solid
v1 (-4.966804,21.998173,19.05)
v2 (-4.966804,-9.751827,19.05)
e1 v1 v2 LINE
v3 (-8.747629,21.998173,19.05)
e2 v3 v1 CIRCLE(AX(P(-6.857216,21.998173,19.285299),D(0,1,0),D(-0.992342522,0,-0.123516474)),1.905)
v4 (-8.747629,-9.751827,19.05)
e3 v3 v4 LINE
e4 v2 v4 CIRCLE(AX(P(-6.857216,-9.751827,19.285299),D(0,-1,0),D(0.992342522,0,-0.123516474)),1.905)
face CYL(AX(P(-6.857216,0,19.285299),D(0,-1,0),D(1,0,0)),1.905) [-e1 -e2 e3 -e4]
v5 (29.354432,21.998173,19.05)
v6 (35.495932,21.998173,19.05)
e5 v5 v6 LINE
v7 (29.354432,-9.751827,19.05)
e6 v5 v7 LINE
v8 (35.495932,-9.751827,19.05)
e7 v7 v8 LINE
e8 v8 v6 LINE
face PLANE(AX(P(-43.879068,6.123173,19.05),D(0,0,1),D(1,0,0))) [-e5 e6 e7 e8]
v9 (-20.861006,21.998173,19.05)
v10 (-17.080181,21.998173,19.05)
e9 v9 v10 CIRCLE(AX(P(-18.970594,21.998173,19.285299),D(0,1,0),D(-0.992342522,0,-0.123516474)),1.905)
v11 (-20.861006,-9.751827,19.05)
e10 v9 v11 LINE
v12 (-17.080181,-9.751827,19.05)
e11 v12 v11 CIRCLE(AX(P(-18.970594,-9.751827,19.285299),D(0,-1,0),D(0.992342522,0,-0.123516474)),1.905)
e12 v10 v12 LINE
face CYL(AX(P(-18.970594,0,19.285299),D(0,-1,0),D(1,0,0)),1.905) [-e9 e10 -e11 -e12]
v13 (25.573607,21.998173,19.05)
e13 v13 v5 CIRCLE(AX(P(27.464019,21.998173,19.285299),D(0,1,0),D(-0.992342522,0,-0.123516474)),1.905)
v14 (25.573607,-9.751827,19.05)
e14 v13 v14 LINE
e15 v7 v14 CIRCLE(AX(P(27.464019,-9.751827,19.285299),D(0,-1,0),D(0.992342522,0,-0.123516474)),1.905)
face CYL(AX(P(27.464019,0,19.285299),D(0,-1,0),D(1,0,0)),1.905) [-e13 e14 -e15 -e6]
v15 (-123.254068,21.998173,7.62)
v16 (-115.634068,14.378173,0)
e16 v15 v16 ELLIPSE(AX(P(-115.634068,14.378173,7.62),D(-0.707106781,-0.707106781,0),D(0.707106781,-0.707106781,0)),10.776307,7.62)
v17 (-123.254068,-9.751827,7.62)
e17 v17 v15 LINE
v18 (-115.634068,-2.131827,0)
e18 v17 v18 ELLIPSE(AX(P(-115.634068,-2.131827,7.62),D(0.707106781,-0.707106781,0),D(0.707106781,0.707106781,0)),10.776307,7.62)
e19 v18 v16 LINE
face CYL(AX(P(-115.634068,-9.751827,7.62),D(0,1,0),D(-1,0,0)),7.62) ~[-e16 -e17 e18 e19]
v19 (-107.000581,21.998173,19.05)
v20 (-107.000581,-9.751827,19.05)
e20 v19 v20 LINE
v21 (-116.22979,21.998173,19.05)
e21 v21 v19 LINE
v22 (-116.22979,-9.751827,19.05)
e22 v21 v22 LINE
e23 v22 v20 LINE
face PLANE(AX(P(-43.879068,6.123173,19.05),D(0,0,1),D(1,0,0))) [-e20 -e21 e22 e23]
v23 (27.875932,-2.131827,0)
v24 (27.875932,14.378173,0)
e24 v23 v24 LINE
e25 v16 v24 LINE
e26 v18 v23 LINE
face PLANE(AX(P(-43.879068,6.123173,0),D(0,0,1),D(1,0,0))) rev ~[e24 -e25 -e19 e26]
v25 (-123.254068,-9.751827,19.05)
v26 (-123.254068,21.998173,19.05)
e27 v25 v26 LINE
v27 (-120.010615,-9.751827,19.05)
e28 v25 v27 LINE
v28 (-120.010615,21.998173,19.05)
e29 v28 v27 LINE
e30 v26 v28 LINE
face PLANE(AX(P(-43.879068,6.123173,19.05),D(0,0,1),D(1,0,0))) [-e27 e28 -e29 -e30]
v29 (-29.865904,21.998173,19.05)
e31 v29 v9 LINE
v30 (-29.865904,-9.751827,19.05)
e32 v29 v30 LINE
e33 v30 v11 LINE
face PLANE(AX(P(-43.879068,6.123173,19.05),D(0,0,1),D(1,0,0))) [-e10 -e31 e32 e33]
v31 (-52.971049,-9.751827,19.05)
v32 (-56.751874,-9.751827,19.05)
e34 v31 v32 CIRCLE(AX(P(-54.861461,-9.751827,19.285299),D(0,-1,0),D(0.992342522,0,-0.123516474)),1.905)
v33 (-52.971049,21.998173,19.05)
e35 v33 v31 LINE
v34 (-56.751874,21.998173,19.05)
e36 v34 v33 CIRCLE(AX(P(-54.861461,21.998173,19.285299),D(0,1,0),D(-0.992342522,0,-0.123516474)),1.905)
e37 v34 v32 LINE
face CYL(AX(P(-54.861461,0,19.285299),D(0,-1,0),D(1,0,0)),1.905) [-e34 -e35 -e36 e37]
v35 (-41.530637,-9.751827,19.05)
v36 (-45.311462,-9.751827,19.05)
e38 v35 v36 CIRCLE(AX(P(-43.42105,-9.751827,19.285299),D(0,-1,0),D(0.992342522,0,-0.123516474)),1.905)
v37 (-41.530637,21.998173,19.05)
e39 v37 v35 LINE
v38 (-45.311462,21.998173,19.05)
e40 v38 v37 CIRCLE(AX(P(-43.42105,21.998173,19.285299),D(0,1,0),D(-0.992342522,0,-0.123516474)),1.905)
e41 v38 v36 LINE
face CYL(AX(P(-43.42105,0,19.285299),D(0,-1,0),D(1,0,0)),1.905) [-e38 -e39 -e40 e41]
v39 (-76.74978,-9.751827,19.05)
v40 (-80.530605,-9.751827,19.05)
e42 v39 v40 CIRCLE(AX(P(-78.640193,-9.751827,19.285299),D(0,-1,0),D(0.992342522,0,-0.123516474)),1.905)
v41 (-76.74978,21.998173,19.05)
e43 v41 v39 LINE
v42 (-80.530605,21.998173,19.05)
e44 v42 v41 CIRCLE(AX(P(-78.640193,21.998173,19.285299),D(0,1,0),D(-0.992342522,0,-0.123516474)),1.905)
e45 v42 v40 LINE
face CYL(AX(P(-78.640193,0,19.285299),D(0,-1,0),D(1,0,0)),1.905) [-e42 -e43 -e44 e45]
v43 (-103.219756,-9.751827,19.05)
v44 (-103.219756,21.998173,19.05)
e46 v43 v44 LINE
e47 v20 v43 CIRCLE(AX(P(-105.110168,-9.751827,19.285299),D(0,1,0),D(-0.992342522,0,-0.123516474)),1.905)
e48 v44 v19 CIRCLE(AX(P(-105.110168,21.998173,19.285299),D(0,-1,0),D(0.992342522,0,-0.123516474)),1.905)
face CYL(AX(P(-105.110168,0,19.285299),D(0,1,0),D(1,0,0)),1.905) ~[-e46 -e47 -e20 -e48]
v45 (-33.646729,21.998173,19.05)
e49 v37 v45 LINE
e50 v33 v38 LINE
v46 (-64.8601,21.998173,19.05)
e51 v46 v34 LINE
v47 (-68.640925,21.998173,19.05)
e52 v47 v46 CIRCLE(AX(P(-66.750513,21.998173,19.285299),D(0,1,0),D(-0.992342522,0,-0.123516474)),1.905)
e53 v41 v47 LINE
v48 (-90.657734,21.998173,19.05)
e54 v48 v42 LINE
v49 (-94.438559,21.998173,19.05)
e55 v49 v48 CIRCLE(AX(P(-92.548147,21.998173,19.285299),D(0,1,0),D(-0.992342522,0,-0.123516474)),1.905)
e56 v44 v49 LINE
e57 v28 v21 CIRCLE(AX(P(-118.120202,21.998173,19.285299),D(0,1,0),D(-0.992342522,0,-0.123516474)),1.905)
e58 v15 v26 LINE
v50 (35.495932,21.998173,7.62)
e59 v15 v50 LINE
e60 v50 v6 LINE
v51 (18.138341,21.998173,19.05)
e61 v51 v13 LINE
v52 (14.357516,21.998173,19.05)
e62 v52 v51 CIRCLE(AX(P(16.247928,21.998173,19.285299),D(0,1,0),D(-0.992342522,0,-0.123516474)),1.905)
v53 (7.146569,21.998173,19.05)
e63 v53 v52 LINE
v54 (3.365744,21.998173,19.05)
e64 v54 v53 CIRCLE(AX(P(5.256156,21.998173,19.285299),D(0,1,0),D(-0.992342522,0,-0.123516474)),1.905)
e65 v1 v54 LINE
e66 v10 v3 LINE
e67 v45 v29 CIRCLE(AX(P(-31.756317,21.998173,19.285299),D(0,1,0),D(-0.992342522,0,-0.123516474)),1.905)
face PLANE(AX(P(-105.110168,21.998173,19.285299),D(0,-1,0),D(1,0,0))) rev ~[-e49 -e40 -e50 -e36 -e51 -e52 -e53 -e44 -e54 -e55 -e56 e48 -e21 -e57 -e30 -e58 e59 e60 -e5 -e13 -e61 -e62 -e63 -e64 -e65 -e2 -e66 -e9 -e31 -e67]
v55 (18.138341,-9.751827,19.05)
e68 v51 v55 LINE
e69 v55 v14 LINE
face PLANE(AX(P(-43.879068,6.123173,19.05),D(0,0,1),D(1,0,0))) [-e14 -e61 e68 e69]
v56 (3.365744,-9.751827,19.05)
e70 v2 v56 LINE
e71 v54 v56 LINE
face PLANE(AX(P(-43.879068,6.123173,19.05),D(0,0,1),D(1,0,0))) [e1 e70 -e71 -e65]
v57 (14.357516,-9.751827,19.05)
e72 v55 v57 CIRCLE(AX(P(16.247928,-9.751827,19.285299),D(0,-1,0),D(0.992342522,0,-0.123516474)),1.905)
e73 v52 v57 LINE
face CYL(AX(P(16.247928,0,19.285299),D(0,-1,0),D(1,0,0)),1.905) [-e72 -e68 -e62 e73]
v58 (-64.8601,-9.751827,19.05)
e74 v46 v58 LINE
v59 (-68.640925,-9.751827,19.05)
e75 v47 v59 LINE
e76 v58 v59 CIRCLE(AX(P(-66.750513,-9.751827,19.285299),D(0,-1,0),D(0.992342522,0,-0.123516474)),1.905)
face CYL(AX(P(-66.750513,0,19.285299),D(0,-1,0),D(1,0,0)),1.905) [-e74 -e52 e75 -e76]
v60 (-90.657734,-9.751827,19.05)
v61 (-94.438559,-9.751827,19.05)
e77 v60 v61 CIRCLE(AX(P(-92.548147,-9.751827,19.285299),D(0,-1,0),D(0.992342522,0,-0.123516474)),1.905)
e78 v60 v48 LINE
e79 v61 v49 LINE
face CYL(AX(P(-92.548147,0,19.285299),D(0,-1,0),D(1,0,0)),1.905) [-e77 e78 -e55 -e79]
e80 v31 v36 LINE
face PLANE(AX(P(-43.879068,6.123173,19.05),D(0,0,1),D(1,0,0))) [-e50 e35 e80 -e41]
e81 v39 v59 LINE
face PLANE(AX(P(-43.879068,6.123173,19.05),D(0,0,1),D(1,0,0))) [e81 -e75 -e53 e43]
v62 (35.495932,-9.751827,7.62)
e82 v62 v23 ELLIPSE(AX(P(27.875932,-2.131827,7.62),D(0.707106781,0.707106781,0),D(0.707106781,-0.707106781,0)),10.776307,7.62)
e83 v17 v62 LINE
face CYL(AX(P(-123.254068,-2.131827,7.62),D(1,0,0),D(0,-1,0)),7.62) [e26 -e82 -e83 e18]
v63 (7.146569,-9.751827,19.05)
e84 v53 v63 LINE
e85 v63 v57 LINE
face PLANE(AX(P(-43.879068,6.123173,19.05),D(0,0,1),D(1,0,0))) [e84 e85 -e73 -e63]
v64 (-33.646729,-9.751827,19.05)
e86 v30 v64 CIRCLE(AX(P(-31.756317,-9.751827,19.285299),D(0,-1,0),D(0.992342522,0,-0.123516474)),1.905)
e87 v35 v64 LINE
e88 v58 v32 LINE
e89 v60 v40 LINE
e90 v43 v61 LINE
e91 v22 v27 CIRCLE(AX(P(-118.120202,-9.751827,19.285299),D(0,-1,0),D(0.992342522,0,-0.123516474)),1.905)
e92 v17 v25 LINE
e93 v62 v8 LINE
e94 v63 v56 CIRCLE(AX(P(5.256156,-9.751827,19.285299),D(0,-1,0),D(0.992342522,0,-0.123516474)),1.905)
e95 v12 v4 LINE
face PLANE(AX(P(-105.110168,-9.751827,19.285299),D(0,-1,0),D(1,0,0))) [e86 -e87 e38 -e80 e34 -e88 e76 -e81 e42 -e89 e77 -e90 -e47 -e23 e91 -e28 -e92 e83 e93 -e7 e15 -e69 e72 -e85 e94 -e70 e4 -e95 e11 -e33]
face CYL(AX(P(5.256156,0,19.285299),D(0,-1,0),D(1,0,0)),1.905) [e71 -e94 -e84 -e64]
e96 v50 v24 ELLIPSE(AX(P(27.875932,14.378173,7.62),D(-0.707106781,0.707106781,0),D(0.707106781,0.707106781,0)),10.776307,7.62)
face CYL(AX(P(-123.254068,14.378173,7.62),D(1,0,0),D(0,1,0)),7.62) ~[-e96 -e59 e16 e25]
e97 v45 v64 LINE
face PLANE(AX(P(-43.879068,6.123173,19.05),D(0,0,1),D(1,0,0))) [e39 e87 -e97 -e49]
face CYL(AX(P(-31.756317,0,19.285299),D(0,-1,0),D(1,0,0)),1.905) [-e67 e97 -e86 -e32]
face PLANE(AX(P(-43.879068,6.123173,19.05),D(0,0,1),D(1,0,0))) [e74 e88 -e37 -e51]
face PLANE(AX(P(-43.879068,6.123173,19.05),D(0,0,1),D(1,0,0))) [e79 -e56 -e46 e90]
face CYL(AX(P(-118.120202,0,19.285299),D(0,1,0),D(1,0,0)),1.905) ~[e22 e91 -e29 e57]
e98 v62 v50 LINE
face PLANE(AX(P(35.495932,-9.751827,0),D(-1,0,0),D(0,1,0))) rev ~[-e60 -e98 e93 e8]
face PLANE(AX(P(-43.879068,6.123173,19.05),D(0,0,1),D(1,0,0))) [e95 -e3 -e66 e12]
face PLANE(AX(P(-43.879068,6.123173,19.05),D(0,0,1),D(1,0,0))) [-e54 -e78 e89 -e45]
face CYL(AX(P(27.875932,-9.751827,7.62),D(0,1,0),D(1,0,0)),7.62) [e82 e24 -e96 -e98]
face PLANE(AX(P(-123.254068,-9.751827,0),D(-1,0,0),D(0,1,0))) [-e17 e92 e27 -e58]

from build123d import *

# Parameters (mm, degrees)
F0_W          = 158.75
F0_H          = 31.75
F1_DEPTH      = 19.05
F3_R          = 7.62
F2_R          = 1.905
F4_DEPTH      = 21.9981725439
F4_DEPTH_BACK = 9.7518274561


with BuildPart() as f1:
    # F0 (on Top) → F1 (new body)
    with BuildSketch(Plane.XY):
        with Locations((-43.8790681958, 6.1231725439)):
            Rectangle(F0_W, F0_H)
    extrude(amount=F1_DEPTH)

    # F3
    f3_edges = [f1.edges().sort_by_distance(p)[0] for p in [
        (-43.879068, 21.998173, 0),
        (-123.254068, 6.123173, 0),
        (-43.879068, -9.751827, 0),
        (35.495932, 6.123173, 0),
    ]]
    fillet(f3_edges, radius=F3_R)

    # F2 (on Front) → F4 (join, two sides)
    with BuildSketch(Plane.XZ) as f4_sk:
        with Locations((-105.110168457, 19.2852988839)):
            Circle(F2_R)
        with Locations((-92.5481468439, 19.2852988839)):
            Circle(F2_R)
        with Locations((-78.6401927471, 19.2852988839)):
            Circle(F2_R)
        with Locations((-66.7505128102, 19.2852988839)):
            Circle(F2_R)
        with Locations((-54.8614611642, 19.2852988839)):
            Circle(F2_R)
        with Locations((-43.4210499542, 19.2852988839)):
            Circle(F2_R)
        with Locations((-31.7563166635, 19.2852988839)):
            Circle(F2_R)
        with Locations((-18.9705938101, 19.2852988839)):
            Circle(F2_R)
        with Locations((-6.8572163582, 19.2852988839)):
            Circle(F2_R)
        with Locations((-118.1202022152, 19.2852988839)):
            Circle(F2_R)
        with Locations((5.2561564371, 19.2852988839)):
            Circle(F2_R)
        with Locations((16.2479281425, 19.2852988839)):
            Circle(F2_R)
        with Locations((27.4640191346, 19.2852988839)):
            Circle(F2_R)
    extrude(amount=-F4_DEPTH)
    extrude(f4_sk.sketch, amount=F4_DEPTH_BACK)


solid = f1.part
